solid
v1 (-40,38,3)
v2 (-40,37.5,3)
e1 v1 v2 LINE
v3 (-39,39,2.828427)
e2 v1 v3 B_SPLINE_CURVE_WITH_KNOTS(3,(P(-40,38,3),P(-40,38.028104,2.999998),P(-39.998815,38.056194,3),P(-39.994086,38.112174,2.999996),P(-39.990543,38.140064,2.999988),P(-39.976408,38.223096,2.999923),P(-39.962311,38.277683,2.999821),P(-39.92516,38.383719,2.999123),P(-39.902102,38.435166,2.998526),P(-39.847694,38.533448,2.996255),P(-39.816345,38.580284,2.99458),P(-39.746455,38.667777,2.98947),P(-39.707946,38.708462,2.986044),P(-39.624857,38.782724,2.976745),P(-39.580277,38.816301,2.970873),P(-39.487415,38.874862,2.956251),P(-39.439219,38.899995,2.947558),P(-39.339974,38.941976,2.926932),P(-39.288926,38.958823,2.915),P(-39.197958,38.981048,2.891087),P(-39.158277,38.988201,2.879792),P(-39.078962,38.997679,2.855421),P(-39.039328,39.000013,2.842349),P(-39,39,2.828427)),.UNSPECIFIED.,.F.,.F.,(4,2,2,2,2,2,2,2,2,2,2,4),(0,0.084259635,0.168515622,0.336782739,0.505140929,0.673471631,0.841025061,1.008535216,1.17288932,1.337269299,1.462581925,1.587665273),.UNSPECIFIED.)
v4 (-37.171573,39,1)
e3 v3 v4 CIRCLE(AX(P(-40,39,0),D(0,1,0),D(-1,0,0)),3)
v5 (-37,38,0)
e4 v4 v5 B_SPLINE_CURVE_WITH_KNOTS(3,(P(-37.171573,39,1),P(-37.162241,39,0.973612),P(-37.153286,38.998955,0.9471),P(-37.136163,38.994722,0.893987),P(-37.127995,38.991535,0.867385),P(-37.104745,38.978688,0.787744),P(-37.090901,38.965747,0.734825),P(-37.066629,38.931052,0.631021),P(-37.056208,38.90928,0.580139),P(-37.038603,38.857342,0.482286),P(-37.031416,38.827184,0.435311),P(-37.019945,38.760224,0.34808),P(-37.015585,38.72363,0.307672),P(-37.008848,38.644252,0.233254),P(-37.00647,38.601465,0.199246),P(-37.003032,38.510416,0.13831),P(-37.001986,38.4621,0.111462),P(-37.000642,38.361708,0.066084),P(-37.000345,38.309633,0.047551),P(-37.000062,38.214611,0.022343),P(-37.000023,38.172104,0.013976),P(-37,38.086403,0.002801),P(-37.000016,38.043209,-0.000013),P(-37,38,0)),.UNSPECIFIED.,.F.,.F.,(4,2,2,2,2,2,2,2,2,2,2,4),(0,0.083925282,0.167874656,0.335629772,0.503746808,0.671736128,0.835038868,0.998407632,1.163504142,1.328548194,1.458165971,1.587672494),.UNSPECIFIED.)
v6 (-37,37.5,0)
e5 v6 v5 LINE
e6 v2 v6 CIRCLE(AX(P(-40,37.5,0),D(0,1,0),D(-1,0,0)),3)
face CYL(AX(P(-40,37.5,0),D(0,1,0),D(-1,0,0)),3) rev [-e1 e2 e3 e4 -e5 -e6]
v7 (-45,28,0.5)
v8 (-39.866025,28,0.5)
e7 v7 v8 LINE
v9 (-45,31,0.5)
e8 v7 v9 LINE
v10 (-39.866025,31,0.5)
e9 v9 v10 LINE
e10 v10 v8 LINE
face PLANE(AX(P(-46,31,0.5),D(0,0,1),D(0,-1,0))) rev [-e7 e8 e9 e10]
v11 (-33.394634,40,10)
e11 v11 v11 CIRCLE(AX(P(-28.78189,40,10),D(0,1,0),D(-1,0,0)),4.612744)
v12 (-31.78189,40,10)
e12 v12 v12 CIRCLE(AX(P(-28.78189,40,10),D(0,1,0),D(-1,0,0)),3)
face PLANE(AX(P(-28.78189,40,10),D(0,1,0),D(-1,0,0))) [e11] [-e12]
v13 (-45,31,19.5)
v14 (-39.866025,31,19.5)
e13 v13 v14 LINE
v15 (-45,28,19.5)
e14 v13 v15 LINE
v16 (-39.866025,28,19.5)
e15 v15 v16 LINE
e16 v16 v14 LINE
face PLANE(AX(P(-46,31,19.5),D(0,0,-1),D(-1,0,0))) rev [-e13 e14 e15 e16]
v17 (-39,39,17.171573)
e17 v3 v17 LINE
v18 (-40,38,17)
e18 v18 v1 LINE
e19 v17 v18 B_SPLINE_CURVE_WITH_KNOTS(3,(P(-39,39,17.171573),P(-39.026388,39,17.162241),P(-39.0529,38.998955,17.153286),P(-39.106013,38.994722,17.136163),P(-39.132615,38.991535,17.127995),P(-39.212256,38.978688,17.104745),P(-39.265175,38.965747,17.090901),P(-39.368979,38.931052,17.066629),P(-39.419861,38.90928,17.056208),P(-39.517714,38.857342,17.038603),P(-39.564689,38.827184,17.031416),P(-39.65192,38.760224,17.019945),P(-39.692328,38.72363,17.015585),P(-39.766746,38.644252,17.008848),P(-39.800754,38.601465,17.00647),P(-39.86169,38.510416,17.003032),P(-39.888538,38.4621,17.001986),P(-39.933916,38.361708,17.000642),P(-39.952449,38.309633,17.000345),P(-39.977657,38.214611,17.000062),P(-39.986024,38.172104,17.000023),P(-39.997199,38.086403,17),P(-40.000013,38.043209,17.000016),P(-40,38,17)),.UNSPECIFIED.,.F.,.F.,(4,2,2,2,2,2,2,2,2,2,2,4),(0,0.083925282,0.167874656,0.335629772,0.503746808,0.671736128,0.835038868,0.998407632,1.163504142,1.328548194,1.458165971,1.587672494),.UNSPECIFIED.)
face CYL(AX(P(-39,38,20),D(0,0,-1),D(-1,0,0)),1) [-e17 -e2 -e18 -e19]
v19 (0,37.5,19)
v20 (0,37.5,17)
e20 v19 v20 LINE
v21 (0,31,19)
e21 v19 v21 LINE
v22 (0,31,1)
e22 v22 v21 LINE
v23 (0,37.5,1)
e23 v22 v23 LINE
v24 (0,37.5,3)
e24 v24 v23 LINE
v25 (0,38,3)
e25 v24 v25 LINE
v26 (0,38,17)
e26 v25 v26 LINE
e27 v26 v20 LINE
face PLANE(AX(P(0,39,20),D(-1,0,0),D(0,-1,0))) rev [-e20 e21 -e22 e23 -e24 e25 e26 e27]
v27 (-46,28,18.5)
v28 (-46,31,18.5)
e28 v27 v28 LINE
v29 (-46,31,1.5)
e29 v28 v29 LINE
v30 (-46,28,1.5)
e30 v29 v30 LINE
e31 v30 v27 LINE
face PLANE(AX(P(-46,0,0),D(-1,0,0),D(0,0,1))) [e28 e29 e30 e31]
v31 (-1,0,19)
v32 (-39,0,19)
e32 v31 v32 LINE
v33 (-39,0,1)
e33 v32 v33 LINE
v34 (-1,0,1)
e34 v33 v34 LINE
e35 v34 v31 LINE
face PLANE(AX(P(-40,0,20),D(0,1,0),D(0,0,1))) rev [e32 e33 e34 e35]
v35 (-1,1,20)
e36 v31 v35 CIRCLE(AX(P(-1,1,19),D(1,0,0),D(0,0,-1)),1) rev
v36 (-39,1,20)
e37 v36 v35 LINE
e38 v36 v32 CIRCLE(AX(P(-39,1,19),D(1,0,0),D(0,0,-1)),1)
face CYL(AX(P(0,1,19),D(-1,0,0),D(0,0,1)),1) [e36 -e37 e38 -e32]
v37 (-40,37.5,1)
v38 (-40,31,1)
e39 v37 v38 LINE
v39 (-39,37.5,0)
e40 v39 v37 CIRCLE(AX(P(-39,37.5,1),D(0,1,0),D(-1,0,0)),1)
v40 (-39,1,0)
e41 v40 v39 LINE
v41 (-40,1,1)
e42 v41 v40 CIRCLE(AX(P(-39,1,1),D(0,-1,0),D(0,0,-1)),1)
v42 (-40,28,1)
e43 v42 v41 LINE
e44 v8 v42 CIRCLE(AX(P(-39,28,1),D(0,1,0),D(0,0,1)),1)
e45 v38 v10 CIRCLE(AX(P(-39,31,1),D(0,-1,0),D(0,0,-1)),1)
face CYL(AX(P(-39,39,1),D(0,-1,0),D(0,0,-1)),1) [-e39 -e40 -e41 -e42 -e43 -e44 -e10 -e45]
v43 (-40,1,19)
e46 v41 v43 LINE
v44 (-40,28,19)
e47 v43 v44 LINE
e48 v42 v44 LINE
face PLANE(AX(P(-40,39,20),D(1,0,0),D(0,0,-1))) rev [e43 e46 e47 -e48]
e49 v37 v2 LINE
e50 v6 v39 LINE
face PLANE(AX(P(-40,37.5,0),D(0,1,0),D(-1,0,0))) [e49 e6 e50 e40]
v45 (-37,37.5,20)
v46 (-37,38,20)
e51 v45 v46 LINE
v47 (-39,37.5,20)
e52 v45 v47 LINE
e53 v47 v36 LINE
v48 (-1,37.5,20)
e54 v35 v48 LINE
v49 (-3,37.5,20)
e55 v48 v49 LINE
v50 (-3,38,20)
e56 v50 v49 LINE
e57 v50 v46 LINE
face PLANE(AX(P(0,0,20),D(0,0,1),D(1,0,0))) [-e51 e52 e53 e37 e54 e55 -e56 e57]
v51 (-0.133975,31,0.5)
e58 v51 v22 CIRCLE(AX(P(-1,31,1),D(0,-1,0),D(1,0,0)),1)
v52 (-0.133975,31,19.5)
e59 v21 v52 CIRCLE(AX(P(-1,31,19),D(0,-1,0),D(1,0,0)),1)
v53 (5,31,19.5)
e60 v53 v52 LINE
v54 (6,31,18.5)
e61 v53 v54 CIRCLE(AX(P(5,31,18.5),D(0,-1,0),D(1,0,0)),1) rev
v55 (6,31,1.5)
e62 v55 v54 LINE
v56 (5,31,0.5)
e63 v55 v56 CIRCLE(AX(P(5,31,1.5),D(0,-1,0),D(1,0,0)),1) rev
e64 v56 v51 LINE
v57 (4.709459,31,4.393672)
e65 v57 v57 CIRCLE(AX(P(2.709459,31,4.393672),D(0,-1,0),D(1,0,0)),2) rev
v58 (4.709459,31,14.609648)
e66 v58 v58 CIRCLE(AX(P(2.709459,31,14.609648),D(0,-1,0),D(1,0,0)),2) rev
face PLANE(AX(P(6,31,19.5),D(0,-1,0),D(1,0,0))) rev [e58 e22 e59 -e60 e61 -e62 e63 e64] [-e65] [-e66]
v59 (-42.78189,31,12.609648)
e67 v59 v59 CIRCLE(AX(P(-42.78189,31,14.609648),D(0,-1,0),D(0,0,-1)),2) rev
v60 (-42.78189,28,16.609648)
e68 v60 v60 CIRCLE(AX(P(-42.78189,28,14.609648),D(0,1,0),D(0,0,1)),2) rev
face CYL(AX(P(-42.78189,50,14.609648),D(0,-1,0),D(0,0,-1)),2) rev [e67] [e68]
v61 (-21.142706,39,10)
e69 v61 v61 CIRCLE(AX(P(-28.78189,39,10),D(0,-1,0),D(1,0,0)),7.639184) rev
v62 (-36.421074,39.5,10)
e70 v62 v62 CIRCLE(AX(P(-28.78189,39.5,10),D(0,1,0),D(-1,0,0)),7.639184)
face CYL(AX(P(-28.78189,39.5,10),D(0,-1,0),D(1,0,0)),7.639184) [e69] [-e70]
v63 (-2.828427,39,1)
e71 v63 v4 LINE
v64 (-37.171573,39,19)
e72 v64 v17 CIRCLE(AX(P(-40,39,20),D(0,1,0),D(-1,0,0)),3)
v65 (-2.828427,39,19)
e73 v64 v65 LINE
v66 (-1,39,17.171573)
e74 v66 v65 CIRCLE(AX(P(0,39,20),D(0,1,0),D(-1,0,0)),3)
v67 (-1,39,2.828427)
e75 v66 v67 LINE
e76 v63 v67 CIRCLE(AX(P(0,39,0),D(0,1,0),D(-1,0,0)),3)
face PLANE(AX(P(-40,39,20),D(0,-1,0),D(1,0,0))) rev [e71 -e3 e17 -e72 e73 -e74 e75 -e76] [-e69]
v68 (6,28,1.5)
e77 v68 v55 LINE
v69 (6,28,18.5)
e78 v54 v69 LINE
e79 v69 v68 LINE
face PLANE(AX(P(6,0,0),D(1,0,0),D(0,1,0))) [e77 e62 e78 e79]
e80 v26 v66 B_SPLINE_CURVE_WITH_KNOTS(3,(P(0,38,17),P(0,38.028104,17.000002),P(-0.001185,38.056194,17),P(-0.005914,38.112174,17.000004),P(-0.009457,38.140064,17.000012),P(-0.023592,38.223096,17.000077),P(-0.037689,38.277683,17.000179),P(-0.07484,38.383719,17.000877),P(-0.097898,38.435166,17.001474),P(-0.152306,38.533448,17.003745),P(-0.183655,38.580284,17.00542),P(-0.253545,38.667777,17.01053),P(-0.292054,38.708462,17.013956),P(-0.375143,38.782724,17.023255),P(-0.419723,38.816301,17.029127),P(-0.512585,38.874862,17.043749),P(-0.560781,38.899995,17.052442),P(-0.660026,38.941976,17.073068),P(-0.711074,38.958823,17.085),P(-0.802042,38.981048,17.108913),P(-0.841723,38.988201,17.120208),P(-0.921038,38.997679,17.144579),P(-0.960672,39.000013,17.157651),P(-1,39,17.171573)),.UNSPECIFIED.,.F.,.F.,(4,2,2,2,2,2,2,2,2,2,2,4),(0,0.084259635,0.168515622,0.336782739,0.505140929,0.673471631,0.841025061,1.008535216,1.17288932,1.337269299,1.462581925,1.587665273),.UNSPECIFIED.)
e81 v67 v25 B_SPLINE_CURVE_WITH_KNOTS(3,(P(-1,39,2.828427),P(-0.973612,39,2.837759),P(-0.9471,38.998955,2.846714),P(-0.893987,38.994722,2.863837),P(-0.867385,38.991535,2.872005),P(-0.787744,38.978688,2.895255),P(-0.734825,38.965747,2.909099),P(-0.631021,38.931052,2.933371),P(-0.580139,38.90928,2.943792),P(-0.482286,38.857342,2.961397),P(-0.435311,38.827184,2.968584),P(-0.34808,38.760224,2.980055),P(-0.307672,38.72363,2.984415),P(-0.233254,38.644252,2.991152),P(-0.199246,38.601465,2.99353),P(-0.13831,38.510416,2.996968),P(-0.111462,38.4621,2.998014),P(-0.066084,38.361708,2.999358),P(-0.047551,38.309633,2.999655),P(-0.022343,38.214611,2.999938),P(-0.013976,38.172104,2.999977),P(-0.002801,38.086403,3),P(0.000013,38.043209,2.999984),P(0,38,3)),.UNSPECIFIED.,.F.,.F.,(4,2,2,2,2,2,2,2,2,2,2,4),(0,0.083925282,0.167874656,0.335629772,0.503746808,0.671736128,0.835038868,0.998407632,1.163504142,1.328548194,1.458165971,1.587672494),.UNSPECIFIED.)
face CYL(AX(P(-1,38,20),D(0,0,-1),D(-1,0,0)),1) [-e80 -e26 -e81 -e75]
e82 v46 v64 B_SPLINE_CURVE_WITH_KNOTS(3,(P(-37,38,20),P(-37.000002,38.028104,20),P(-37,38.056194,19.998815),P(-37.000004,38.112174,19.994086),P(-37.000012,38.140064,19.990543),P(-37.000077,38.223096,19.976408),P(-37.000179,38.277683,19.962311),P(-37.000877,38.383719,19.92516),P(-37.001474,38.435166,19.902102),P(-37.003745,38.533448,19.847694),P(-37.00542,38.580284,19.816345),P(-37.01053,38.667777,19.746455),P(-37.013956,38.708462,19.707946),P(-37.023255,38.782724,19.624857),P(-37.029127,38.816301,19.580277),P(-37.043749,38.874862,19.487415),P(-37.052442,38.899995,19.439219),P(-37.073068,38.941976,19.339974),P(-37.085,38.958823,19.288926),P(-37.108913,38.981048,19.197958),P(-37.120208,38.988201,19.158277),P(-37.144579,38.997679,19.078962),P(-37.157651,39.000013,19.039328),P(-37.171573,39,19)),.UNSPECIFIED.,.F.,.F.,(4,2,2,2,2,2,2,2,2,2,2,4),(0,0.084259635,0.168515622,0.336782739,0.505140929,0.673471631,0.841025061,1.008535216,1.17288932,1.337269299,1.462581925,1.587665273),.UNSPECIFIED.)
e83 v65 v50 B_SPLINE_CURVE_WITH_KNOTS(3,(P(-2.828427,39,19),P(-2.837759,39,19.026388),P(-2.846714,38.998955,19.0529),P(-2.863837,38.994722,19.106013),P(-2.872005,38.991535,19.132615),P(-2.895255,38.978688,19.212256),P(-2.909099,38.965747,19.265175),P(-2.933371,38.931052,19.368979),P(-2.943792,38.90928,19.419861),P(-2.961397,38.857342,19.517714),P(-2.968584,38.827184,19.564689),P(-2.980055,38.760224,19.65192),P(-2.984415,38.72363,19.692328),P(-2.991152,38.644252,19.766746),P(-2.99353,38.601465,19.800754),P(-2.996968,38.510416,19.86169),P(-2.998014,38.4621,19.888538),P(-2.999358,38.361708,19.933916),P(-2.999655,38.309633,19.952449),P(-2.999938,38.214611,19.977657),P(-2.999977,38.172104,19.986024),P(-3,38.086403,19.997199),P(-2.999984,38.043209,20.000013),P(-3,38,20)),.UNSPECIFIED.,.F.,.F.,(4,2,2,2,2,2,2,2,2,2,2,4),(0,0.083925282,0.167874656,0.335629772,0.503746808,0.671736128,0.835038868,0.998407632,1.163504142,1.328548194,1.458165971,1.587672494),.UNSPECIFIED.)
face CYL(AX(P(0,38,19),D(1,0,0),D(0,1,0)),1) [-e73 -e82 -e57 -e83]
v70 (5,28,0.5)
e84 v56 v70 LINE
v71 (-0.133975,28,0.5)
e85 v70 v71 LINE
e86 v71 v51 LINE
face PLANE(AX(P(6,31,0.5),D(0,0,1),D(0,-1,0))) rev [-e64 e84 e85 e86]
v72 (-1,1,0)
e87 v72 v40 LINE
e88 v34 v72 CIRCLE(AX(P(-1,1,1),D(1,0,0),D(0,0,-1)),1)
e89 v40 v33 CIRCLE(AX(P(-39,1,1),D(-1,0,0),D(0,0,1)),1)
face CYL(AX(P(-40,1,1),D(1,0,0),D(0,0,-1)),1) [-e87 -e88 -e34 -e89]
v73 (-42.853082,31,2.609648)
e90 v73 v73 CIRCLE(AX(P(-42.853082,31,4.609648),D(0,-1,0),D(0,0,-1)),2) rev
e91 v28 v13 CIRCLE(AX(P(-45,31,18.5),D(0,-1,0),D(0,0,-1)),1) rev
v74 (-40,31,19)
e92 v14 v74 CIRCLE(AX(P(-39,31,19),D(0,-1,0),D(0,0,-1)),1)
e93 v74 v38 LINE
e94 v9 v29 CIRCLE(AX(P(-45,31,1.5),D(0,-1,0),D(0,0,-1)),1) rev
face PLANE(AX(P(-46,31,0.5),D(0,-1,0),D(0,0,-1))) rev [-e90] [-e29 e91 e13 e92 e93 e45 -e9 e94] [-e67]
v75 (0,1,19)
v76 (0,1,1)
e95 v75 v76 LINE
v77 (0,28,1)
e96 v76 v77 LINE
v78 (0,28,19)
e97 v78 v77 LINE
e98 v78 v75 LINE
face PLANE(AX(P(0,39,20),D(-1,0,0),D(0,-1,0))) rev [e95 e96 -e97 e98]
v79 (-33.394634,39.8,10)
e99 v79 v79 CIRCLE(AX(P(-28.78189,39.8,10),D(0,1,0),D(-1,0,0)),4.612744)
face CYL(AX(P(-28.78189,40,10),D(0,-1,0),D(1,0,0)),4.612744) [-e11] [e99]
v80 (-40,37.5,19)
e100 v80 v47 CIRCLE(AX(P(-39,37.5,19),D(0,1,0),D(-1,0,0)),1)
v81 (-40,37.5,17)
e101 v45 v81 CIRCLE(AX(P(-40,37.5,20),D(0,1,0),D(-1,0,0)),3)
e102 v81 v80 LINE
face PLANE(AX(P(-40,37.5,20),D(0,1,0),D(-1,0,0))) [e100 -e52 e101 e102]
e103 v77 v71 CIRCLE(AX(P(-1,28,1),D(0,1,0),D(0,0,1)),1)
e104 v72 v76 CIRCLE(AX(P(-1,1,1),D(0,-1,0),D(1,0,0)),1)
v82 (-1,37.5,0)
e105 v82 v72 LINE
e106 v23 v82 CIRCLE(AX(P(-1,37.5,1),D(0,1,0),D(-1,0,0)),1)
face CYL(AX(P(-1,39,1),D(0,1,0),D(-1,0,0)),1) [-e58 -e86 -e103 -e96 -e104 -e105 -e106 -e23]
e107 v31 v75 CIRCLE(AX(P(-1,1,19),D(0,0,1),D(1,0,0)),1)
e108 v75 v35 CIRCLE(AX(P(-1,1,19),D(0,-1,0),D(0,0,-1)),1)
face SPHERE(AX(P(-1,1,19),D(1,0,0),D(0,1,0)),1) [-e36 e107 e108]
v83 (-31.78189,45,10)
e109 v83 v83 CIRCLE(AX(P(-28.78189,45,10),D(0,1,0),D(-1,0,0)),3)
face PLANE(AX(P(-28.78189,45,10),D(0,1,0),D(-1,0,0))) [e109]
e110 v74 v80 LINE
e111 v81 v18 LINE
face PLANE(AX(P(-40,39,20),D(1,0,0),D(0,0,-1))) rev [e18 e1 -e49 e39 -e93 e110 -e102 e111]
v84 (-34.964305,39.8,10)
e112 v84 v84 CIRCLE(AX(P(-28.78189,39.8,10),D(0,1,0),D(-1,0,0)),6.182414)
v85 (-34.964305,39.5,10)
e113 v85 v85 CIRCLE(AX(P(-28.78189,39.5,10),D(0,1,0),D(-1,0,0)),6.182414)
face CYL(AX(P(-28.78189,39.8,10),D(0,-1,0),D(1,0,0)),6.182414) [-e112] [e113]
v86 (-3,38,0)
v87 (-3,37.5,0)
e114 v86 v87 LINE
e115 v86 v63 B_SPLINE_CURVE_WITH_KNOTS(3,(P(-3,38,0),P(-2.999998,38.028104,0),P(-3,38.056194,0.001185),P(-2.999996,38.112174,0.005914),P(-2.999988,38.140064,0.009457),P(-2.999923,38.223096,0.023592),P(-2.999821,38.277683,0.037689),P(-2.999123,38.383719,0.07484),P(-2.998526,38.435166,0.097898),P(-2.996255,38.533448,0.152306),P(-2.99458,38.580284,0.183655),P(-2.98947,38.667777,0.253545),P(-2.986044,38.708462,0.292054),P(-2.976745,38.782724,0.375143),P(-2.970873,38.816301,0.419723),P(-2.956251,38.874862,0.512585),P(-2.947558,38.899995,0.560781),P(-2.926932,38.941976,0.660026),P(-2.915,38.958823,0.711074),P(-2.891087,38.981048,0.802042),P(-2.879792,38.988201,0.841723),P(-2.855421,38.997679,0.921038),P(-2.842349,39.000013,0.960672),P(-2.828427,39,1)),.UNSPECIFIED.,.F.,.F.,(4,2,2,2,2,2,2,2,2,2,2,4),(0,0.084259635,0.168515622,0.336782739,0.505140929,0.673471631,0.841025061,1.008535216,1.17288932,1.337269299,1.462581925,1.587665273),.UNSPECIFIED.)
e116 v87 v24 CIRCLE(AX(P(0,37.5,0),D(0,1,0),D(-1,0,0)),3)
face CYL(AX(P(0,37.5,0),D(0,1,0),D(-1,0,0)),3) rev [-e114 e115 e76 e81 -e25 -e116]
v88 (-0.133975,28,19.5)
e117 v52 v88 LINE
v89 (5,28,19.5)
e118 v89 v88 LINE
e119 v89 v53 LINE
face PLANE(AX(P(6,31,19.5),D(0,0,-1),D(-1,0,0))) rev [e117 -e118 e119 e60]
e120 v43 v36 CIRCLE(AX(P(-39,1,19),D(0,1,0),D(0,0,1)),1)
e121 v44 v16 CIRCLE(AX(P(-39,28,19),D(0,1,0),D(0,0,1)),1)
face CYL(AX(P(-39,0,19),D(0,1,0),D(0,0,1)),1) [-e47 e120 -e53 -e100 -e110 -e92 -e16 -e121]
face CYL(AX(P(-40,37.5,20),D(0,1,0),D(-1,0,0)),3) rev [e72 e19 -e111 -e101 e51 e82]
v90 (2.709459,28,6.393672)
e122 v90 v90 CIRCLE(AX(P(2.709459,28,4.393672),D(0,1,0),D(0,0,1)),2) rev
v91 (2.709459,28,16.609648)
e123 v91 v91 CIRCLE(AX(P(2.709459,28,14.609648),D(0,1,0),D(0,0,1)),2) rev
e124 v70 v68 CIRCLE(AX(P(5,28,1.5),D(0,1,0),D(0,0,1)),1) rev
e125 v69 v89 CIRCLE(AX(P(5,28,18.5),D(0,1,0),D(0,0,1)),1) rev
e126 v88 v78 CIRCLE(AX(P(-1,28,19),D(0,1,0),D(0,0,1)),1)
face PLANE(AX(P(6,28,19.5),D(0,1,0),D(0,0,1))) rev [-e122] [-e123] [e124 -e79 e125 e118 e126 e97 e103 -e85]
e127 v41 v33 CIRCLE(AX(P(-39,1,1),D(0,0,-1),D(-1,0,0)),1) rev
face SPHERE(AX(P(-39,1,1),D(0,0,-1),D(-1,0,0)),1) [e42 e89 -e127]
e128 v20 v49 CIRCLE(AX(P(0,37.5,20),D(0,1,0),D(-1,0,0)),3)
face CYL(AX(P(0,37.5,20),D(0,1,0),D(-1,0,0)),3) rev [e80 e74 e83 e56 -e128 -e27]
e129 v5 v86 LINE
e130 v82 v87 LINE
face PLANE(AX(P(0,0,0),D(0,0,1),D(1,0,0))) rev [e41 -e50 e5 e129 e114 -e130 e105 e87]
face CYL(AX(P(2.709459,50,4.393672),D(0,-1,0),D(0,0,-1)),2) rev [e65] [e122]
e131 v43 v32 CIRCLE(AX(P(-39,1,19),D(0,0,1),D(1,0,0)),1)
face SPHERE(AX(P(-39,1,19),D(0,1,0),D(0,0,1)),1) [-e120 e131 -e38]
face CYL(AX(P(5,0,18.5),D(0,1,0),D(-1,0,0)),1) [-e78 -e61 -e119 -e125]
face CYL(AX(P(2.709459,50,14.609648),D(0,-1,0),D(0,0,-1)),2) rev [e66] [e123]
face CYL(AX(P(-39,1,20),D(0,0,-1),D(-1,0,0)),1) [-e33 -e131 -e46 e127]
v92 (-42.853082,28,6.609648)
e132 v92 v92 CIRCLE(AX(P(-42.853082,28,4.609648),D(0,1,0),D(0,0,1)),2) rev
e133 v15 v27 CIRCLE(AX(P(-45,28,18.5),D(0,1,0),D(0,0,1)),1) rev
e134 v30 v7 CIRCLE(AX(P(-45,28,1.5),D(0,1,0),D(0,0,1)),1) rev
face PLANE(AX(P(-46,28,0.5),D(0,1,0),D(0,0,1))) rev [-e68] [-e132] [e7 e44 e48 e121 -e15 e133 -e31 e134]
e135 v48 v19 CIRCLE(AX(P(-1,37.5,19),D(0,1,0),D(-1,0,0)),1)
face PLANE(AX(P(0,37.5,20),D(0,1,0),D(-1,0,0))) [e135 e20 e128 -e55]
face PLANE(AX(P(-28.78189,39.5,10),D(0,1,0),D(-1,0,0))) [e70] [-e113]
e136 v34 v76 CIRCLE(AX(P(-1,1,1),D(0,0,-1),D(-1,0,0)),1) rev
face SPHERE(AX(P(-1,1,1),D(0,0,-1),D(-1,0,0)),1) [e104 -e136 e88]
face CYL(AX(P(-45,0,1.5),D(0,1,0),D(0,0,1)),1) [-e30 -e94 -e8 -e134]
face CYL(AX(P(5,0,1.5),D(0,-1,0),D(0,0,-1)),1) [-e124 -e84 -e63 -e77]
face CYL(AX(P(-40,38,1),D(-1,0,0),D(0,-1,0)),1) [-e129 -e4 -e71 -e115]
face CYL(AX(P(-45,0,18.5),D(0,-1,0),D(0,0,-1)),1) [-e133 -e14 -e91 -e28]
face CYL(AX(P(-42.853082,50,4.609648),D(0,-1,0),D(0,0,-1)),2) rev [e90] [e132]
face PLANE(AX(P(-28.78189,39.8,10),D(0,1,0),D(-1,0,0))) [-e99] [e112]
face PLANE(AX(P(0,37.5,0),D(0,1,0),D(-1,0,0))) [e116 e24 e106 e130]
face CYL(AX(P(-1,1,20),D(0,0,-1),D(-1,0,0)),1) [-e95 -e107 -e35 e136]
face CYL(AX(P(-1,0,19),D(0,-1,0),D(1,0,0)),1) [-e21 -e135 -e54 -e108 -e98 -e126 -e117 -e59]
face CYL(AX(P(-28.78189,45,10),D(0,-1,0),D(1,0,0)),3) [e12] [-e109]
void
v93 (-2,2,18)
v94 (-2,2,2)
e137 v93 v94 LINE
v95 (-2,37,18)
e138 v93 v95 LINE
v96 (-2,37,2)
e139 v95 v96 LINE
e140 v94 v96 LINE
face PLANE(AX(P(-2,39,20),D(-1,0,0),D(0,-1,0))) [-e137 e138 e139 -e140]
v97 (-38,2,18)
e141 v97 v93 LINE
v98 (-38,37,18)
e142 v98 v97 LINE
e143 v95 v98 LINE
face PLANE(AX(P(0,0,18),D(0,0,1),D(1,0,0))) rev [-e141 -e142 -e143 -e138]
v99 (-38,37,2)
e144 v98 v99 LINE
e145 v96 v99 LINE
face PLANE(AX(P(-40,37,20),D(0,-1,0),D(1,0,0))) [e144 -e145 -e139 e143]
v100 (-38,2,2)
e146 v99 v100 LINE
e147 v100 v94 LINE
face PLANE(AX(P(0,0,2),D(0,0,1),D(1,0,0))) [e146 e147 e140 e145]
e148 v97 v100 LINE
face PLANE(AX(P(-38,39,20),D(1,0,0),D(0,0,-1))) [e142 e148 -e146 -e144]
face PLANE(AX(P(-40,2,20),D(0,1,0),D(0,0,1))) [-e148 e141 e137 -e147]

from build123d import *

# Parameters (mm, degrees)
SKETCH_1_W           = 40
SKETCH_1_H           = 39
EXTRUDE_1_DEPTH      = 20
SHELL_1_T            = 2
SKETCH_18_R          = 7.639183899
EXTRUDE_8_DEPTH      = 0.5
SKETCH_24_R          = 6.182414347
EXTRUDE_12_DEPTH     = 0.3
SKETCH_25_R          = 4.612744259
EXTRUDE_13_DEPTH     = 0.2
SKETCH_52_R          = 3
EXTRUDE_14_DEPTH     = 5
SKETCH_55_R          = 3
CUT_EXTRUDE_37_DEPTH = 1.5
SKETCH_78_W          = 19
SKETCH_78_H          = 3
EXTRUDE_16_DEPTH     = 6
SKETCH_79_W          = 19
SKETCH_79_H          = 3
EXTRUDE_17_DEPTH     = 6
FILLET_7_R           = 1
SKETCH_5_R           = 2
CUT_EXTRUDE_45_DEPTH = 50
FILLET_8_R           = 1


with BuildPart() as part:
    # 草图1 → 凸台-拉伸1 (new body)
    with BuildSketch(Plane.XY):
        with Locations((-20, 19.5)):
            Rectangle(SKETCH_1_W, SKETCH_1_H)
    extrude(amount=EXTRUDE_1_DEPTH)

    # 抽壳1 (no face opened: a closed hollow body)
    add(offset(amount=-SHELL_1_T, mode=Mode.PRIVATE), mode=Mode.SUBTRACT)

    # 草图18 → 凸台-拉伸8 (add)
    with BuildSketch(Plane(origin=(0, 39, 0), x_dir=(1, 0, 0), z_dir=(0, 1, 0))):
        with Locations((-28.781890175, -10)):
            Circle(SKETCH_18_R)
    extrude(amount=EXTRUDE_8_DEPTH)

    # 草图24 → 凸台-拉伸12 (add)
    with BuildSketch(Plane(origin=(0, 39.5, 0), x_dir=(1, 0, 0), z_dir=(0, 1, 0))):
        with Locations(Location((-28.781890175, -10, 0), (0, 0, 180))):
            Circle(SKETCH_24_R)
    extrude(amount=EXTRUDE_12_DEPTH)

    # 草图25 → 凸台-拉伸13 (add)
    with BuildSketch(Plane(origin=(0, 39.8, 0), x_dir=(1, 0, 0), z_dir=(0, 1, 0))):
        with Locations(Location((-28.781890175, -10, 0), (0, 0, 180))):
            Circle(SKETCH_25_R)
    extrude(amount=EXTRUDE_13_DEPTH)

    # 草图52 → 凸台-拉伸14 (add)
    with BuildSketch(Plane(origin=(0, 40, 0), x_dir=(1, 0, 0), z_dir=(0, 1, 0))):
        with Locations(Location((-28.781890175, -10, 0), (0, 0, 180))):
            Circle(SKETCH_52_R)
    extrude(amount=EXTRUDE_14_DEPTH)

    # 草图55 → 切除-拉伸37 (cut)
    with BuildSketch(Plane(origin=(0, 39, 0), x_dir=(1, 0, 0), z_dir=(0, 1, 0))):
        with Locations((-40, -20)):
            Circle(SKETCH_55_R)
        with Locations((-40, 0)):
            Circle(SKETCH_55_R)
        with Locations((0, -20)):
            Circle(SKETCH_55_R)
        Circle(SKETCH_55_R)
    extrude(amount=-CUT_EXTRUDE_37_DEPTH, mode=Mode.SUBTRACT)

    # 草图78 → 凸台-拉伸16 (add)
    with BuildSketch(Plane(origin=(0, 0, 0), x_dir=(0, 0, -1), z_dir=(1, 0, 0))):
        with Locations((-10, 29.5)):
            Rectangle(SKETCH_78_W, SKETCH_78_H)
    extrude(amount=EXTRUDE_16_DEPTH)

    # 草图79 → 凸台-拉伸17 (add)
    with BuildSketch(Plane.ZY.offset(40)):
        with Locations((10, 29.5)):
            Rectangle(SKETCH_79_W, SKETCH_79_H)
    extrude(amount=EXTRUDE_17_DEPTH)

    # 圆角7
    # the kernel refuses this fillet: 1 mm, written as the material it takes off along each edge
    with BuildSketch(Plane(origin=(-46, 33.5, 19.5), x_dir=(1, 0, 0), z_dir=(0, -1, 0))) as fillet_7_piece_1:
        with BuildLine():
            CenterArc((FILLET_7_R, -FILLET_7_R), FILLET_7_R, 90, 90)
            Line((0, -FILLET_7_R), (0, 0))
            Line((0, 0), (FILLET_7_R, 0))
        make_face()
    extrude(amount=8, mode=Mode.SUBTRACT)
    with BuildSketch(Plane(origin=(-40, -2.5, 20), x_dir=(1, 0, 0), z_dir=(0, 1, 0))) as fillet_7_piece_2_section:
        with BuildLine():
            CenterArc((FILLET_7_R, FILLET_7_R), FILLET_7_R, 180, 90)
            Line((0, FILLET_7_R), (0, 0))
            Line((0, 0), (FILLET_7_R, 0))
        make_face()
    fillet_7_piece_2 = extrude(amount=42.5, mode=Mode.PRIVATE)
    fillet_7_piece_2 = split(fillet_7_piece_2, bisect_by=Plane(origin=(-39.74487994, 28, 19.835608236), z_dir=(0, -1, 0)), keep=Keep.TOP, mode=Mode.PRIVATE)
    fillet_7_piece_2 = split(fillet_7_piece_2, bisect_by=Plane(origin=(-39.74487994, 12.75, 19.5), z_dir=(0, 0, 1)), keep=Keep.TOP, mode=Mode.PRIVATE)
    add(fillet_7_piece_2, mode=Mode.SUBTRACT)
    with BuildSketch(Plane(origin=(-40, -2.5, 20), x_dir=(1, 0, 0), z_dir=(0, 1, 0))) as fillet_7_piece_3_section:
        with BuildLine():
            CenterArc((FILLET_7_R, FILLET_7_R), FILLET_7_R, 180, 90)
            Line((0, FILLET_7_R), (0, 0))
            Line((0, 0), (FILLET_7_R, 0))
        make_face()
    fillet_7_piece_3 = extrude(amount=42.5, mode=Mode.PRIVATE)
    fillet_7_piece_3 = split(fillet_7_piece_3, bisect_by=Plane(origin=(-39.975991618, 28, 19.336749215), z_dir=(0, -1, 0)), keep=Keep.TOP, mode=Mode.PRIVATE)
    fillet_7_piece_3 = split(fillet_7_piece_3, bisect_by=Plane(origin=(-39.975991618, 12.75, 19.5), z_dir=(0, 0, -1)), keep=Keep.TOP, mode=Mode.PRIVATE)
    add(fillet_7_piece_3, mode=Mode.SUBTRACT)
    with BuildSketch(Plane(origin=(-40, -2.5, 20), x_dir=(1, 0, 0), z_dir=(0, 1, 0))) as fillet_7_piece_4_section:
        with BuildLine():
            CenterArc((FILLET_7_R, FILLET_7_R), FILLET_7_R, 180, 90)
            Line((0, FILLET_7_R), (0, 0))
            Line((0, 0), (FILLET_7_R, 0))
        make_face()
    fillet_7_piece_4 = extrude(amount=42.5, mode=Mode.PRIVATE)
    fillet_7_piece_4 = split(fillet_7_piece_4, bisect_by=Plane(origin=(-39.74487994, 28, 19.835608236), z_dir=(0, 1, 0)), keep=Keep.TOP, mode=Mode.PRIVATE)
    fillet_7_piece_4 = split(fillet_7_piece_4, bisect_by=Plane(origin=(-39.74487994, 29.5, 19.5), z_dir=(0, 0, 1)), keep=Keep.TOP, mode=Mode.PRIVATE)
    fillet_7_piece_4 = split(fillet_7_piece_4, bisect_by=Plane(origin=(-39.74487994, 31, 19.835608236), z_dir=(0, -1, 0)), keep=Keep.TOP, mode=Mode.PRIVATE)
    add(fillet_7_piece_4, mode=Mode.SUBTRACT)
    with BuildSketch(Plane(origin=(-40, -2.5, 20), x_dir=(1, 0, 0), z_dir=(0, 1, 0))) as fillet_7_piece_5_section:
        with BuildLine():
            CenterArc((FILLET_7_R, FILLET_7_R), FILLET_7_R, 180, 90)
            Line((0, FILLET_7_R), (0, 0))
            Line((0, 0), (FILLET_7_R, 0))
        make_face()
    fillet_7_piece_5 = extrude(amount=42.5, mode=Mode.PRIVATE)
    fillet_7_piece_5 = split(fillet_7_piece_5, bisect_by=Plane(origin=(-39.74487994, 35.5, 19.5), z_dir=(0, 0, 1)), keep=Keep.TOP, mode=Mode.PRIVATE)
    fillet_7_piece_5 = split(fillet_7_piece_5, bisect_by=Plane(origin=(-39.74487994, 31, 19.835608236), z_dir=(0, 1, 0)), keep=Keep.TOP, mode=Mode.PRIVATE)
    add(fillet_7_piece_5, mode=Mode.SUBTRACT)
    with BuildSketch(Plane(origin=(-40, -2.5, 20), x_dir=(1, 0, 0), z_dir=(0, 1, 0))) as fillet_7_piece_6_section:
        with BuildLine():
            CenterArc((FILLET_7_R, FILLET_7_R), FILLET_7_R, 180, 90)
            Line((0, FILLET_7_R), (0, 0))
            Line((0, 0), (FILLET_7_R, 0))
        make_face()
    fillet_7_piece_6 = extrude(amount=42.5, mode=Mode.PRIVATE)
    fillet_7_piece_6 = split(fillet_7_piece_6, bisect_by=Plane(origin=(-39.975991618, 35.5, 19.5), z_dir=(0, 0, -1)), keep=Keep.TOP, mode=Mode.PRIVATE)
    fillet_7_piece_6 = split(fillet_7_piece_6, bisect_by=Plane(origin=(-39.975991618, 31, 19.336749215), z_dir=(0, 1, 0)), keep=Keep.TOP, mode=Mode.PRIVATE)
    add(fillet_7_piece_6, mode=Mode.SUBTRACT)

    # 草图5 → 切除-拉伸45 (cut)
    with BuildSketch(Plane(origin=(0, 0, 0), x_dir=(1, 0, 0), z_dir=(0, 1, 0))):
        with Locations(Location((-42.781890175, -14.609647665, 0), (0, 0, 90))):
            Circle(SKETCH_5_R)
        with Locations(Location((-42.853081645, -4.609647665, 0), (0, 0, 90))):
            Circle(SKETCH_5_R)
        with Locations((2.709458981, -4.393671759)):
            Circle(SKETCH_5_R)
        with Locations((2.709458981, -14.609647665)):
            Circle(SKETCH_5_R)
    extrude(amount=CUT_EXTRUDE_45_DEPTH, mode=Mode.SUBTRACT)

    # 圆角8
    # the kernel refuses this fillet: 1 mm, written as the material it takes off along each edge
    with BuildSketch(Plane(origin=(-1, 1, 19), x_dir=(1, 0, 0), z_dir=(0, -1, 0))) as fillet_8_piece_1_section:
        Polygon((0, 0), (FILLET_8_R, 0), (FILLET_8_R, FILLET_8_R), (0, FILLET_8_R), align=None)
    fillet_8_piece_1 = extrude(amount=FILLET_8_R, mode=Mode.PRIVATE)
    fillet_8_piece_1 = fillet_8_piece_1 - Plane(origin=(-1, 1, 19), x_dir=(-0.7071067811865475, 0, -0.7071067811865475), z_dir=(0, -1, 0)) * Sphere(FILLET_8_R, mode=Mode.PRIVATE)
    add(fillet_8_piece_1, mode=Mode.SUBTRACT)
    with BuildSketch(Plane(origin=(-39, 1, 1), x_dir=(0, 0, -1), z_dir=(-1, 0, 0))) as fillet_8_piece_2_section:
        Polygon((0, 0), (FILLET_8_R, 0), (FILLET_8_R, FILLET_8_R), (0, FILLET_8_R), align=None)
    fillet_8_piece_2 = extrude(amount=FILLET_8_R, mode=Mode.PRIVATE)
    fillet_8_piece_2 = fillet_8_piece_2 - Plane(origin=(-39, 1, 1), x_dir=(0, 0.7071067811865475, 0.7071067811865475), z_dir=(-1, 0, 0)) * Sphere(FILLET_8_R, mode=Mode.PRIVATE)
    add(fillet_8_piece_2, mode=Mode.SUBTRACT)
    with BuildSketch(Plane(origin=(-1, 1, 1), x_dir=(0, -1, 0), z_dir=(0, 0, -1))) as fillet_8_piece_3_section:
        Polygon((0, 0), (FILLET_8_R, 0), (FILLET_8_R, -FILLET_8_R), (0, -FILLET_8_R), align=None)
    fillet_8_piece_3 = extrude(amount=FILLET_8_R, mode=Mode.PRIVATE)
    fillet_8_piece_3 = fillet_8_piece_3 - Plane(origin=(-1, 1, 1), x_dir=(-0.7071067811865475, 0.7071067811865475, 0), z_dir=(0, 0, -1)) * Sphere(FILLET_8_R, mode=Mode.PRIVATE)
    add(fillet_8_piece_3, mode=Mode.SUBTRACT)
    with BuildSketch(Plane(origin=(-1, 0, 20), x_dir=(0, 1, 0), z_dir=(-1, 0, 0))) as fillet_8_piece_4:
        with BuildLine():
            CenterArc((FILLET_8_R, FILLET_8_R), FILLET_8_R, 180, 90)
            Line((0, FILLET_8_R), (0, 0))
            Line((0, 0), (FILLET_8_R, 0))
        make_face()
    extrude(amount=38, mode=Mode.SUBTRACT)
    with BuildSketch(Plane(origin=(-39, 0, 19), x_dir=(0, 0, 1), z_dir=(1, 0, 0))) as fillet_8_piece_5:
        with BuildLine():
            CenterArc((1 - FILLET_8_R, -FILLET_8_R), FILLET_8_R, 0, 90)
            Line((1, -FILLET_8_R), (1, 0))
            Line((1, 0), (1 - FILLET_8_R, 0))
        make_face()
    revolve(axis=Axis((-39, 0, 19), (0, -1, 0)), revolution_arc=90, mode=Mode.SUBTRACT)
    with BuildSketch(Plane(origin=(-40, 0, 1), x_dir=(0, 1, 0), z_dir=(0, 0, 1))) as fillet_8_piece_6:
        with BuildLine():
            CenterArc((FILLET_8_R, -FILLET_8_R), FILLET_8_R, 90, 90)
            Line((0, -FILLET_8_R), (0, 0))
            Line((0, 0), (FILLET_8_R, 0))
        make_face()
    extrude(amount=18, mode=Mode.SUBTRACT)
    with BuildSketch(Plane(origin=(0, 0, 1), x_dir=(0, 1, 0), z_dir=(0, 0, 1))) as fillet_8_piece_7:
        with BuildLine():
            CenterArc((FILLET_8_R, FILLET_8_R), FILLET_8_R, 180, 90)
            Line((0, FILLET_8_R), (0, 0))
            Line((0, 0), (FILLET_8_R, 0))
        make_face()
    extrude(amount=18, mode=Mode.SUBTRACT)
    with BuildSketch(Plane(origin=(-1, 0, 0), x_dir=(0, 1, 0), z_dir=(-1, 0, 0))) as fillet_8_piece_8:
        with BuildLine():
            CenterArc((FILLET_8_R, -FILLET_8_R), FILLET_8_R, 90, 90)
            Line((0, -FILLET_8_R), (0, 0))
            Line((0, 0), (FILLET_8_R, 0))
        make_face()
    extrude(amount=38, mode=Mode.SUBTRACT)
    with BuildSketch(Plane(origin=(0, 40, 0), x_dir=(-1, 0, 0), z_dir=(0, -1, 0))) as fillet_8_piece_9_section:
        with BuildLine():
            CenterArc((FILLET_8_R, -FILLET_8_R), FILLET_8_R, 90, 90)
            Line((0, -FILLET_8_R), (0, 0))
            Line((0, 0), (FILLET_8_R, 0))
        make_face()
    fillet_8_piece_9 = extrude(amount=39, mode=Mode.PRIVATE)
    fillet_8_piece_9 = split(fillet_8_piece_9, bisect_by=Plane(origin=(-0.25512006, 35.5, 0.5), z_dir=(0, 0, -1)), keep=Keep.TOP, mode=Mode.PRIVATE)
    fillet_8_piece_9 = split(fillet_8_piece_9, bisect_by=Plane(origin=(-0.25512006, 31, 0.164391764), z_dir=(0, 1, 0)), keep=Keep.TOP, mode=Mode.PRIVATE)
    add(fillet_8_piece_9, mode=Mode.SUBTRACT)
    with BuildSketch(Plane(origin=(0, 40, 0), x_dir=(-1, 0, 0), z_dir=(0, -1, 0))) as fillet_8_piece_10_section:
        with BuildLine():
            CenterArc((FILLET_8_R, -FILLET_8_R), FILLET_8_R, 90, 90)
            Line((0, -FILLET_8_R), (0, 0))
            Line((0, 0), (FILLET_8_R, 0))
        make_face()
    fillet_8_piece_10 = extrude(amount=39, mode=Mode.PRIVATE)
    fillet_8_piece_10 = split(fillet_8_piece_10, bisect_by=Plane(origin=(-0.024008382, 35.5, 0.5), z_dir=(0, 0, 1)), keep=Keep.TOP, mode=Mode.PRIVATE)
    fillet_8_piece_10 = split(fillet_8_piece_10, bisect_by=Plane(origin=(-0.024008382, 31, 0.663250785), z_dir=(0, 1, 0)), keep=Keep.TOP, mode=Mode.PRIVATE)
    add(fillet_8_piece_10, mode=Mode.SUBTRACT)
    with BuildSketch(Plane(origin=(0, 40, 0), x_dir=(-1, 0, 0), z_dir=(0, -1, 0))) as fillet_8_piece_11_section:
        with BuildLine():
            CenterArc((FILLET_8_R, -FILLET_8_R), FILLET_8_R, 90, 90)
            Line((0, -FILLET_8_R), (0, 0))
            Line((0, 0), (FILLET_8_R, 0))
        make_face()
    fillet_8_piece_11 = extrude(amount=39, mode=Mode.PRIVATE)
    fillet_8_piece_11 = split(fillet_8_piece_11, bisect_by=Plane(origin=(-0.25512006, 28, 0.164391764), z_dir=(0, 1, 0)), keep=Keep.TOP, mode=Mode.PRIVATE)
    fillet_8_piece_11 = split(fillet_8_piece_11, bisect_by=Plane(origin=(-0.25512006, 29.5, 0.5), z_dir=(0, 0, -1)), keep=Keep.TOP, mode=Mode.PRIVATE)
    fillet_8_piece_11 = split(fillet_8_piece_11, bisect_by=Plane(origin=(-0.25512006, 31, 0.164391764), z_dir=(0, -1, 0)), keep=Keep.TOP, mode=Mode.PRIVATE)
    add(fillet_8_piece_11, mode=Mode.SUBTRACT)
    with BuildSketch(Plane(origin=(0, 40, 0), x_dir=(-1, 0, 0), z_dir=(0, -1, 0))) as fillet_8_piece_12_section:
        with BuildLine():
            CenterArc((FILLET_8_R, -FILLET_8_R), FILLET_8_R, 90, 90)
            Line((0, -FILLET_8_R), (0, 0))
            Line((0, 0), (FILLET_8_R, 0))
        make_face()
    fillet_8_piece_12 = extrude(amount=39, mode=Mode.PRIVATE)
    fillet_8_piece_12 = split(fillet_8_piece_12, bisect_by=Plane(origin=(-0.25512006, 28, 0.164391764), z_dir=(0, -1, 0)), keep=Keep.TOP, mode=Mode.PRIVATE)
    fillet_8_piece_12 = split(fillet_8_piece_12, bisect_by=Plane(origin=(-0.25512006, 14.5, 0.5), z_dir=(0, 0, -1)), keep=Keep.TOP, mode=Mode.PRIVATE)
    add(fillet_8_piece_12, mode=Mode.SUBTRACT)
    with BuildSketch(Plane(origin=(0, 40, 0), x_dir=(-1, 0, 0), z_dir=(0, -1, 0))) as fillet_8_piece_13_section:
        with BuildLine():
            CenterArc((FILLET_8_R, -FILLET_8_R), FILLET_8_R, 90, 90)
            Line((0, -FILLET_8_R), (0, 0))
            Line((0, 0), (FILLET_8_R, 0))
        make_face()
    fillet_8_piece_13 = extrude(amount=39, mode=Mode.PRIVATE)
    fillet_8_piece_13 = split(fillet_8_piece_13, bisect_by=Plane(origin=(-0.024008382, 28, 0.663250785), z_dir=(0, -1, 0)), keep=Keep.TOP, mode=Mode.PRIVATE)
    fillet_8_piece_13 = split(fillet_8_piece_13, bisect_by=Plane(origin=(-0.024008382, 14.5, 0.5), z_dir=(0, 0, 1)), keep=Keep.TOP, mode=Mode.PRIVATE)
    add(fillet_8_piece_13, mode=Mode.SUBTRACT)
    with BuildSketch(Plane(origin=(-40, 1, 0), x_dir=(1, 0, 0), z_dir=(0, 1, 0))) as fillet_8_piece_14_section:
        with BuildLine():
            CenterArc((FILLET_8_R, -FILLET_8_R), FILLET_8_R, 90, 90)
            Line((0, -FILLET_8_R), (0, 0))
            Line((0, 0), (FILLET_8_R, 0))
        make_face()
    fillet_8_piece_14 = extrude(amount=39, mode=Mode.PRIVATE)
    fillet_8_piece_14 = split(fillet_8_piece_14, bisect_by=Plane(origin=(-39.74487994, 14.5, 0.5), z_dir=(0, 0, -1)), keep=Keep.TOP, mode=Mode.PRIVATE)
    fillet_8_piece_14 = split(fillet_8_piece_14, bisect_by=Plane(origin=(-39.74487994, 28, 0.164391764), z_dir=(0, -1, 0)), keep=Keep.TOP, mode=Mode.PRIVATE)
    add(fillet_8_piece_14, mode=Mode.SUBTRACT)
    with BuildSketch(Plane(origin=(-40, 1, 0), x_dir=(1, 0, 0), z_dir=(0, 1, 0))) as fillet_8_piece_15_section:
        with BuildLine():
            CenterArc((FILLET_8_R, -FILLET_8_R), FILLET_8_R, 90, 90)
            Line((0, -FILLET_8_R), (0, 0))
            Line((0, 0), (FILLET_8_R, 0))
        make_face()
    fillet_8_piece_15 = extrude(amount=39, mode=Mode.PRIVATE)
    fillet_8_piece_15 = split(fillet_8_piece_15, bisect_by=Plane(origin=(-39.975991618, 14.5, 0.5), z_dir=(0, 0, 1)), keep=Keep.TOP, mode=Mode.PRIVATE)
    fillet_8_piece_15 = split(fillet_8_piece_15, bisect_by=Plane(origin=(-39.975991618, 28, 0.663250785), z_dir=(0, -1, 0)), keep=Keep.TOP, mode=Mode.PRIVATE)
    add(fillet_8_piece_15, mode=Mode.SUBTRACT)
    with BuildSketch(Plane(origin=(-40, 1, 0), x_dir=(1, 0, 0), z_dir=(0, 1, 0))) as fillet_8_piece_16_section:
        with BuildLine():
            CenterArc((FILLET_8_R, -FILLET_8_R), FILLET_8_R, 90, 90)
            Line((0, -FILLET_8_R), (0, 0))
            Line((0, 0), (FILLET_8_R, 0))
        make_face()
    fillet_8_piece_16 = extrude(amount=39, mode=Mode.PRIVATE)
    fillet_8_piece_16 = split(fillet_8_piece_16, bisect_by=Plane(origin=(-39.74487994, 31, 0.164391764), z_dir=(0, -1, 0)), keep=Keep.TOP, mode=Mode.PRIVATE)
    fillet_8_piece_16 = split(fillet_8_piece_16, bisect_by=Plane(origin=(-39.74487994, 29.5, 0.5), z_dir=(0, 0, -1)), keep=Keep.TOP, mode=Mode.PRIVATE)
    fillet_8_piece_16 = split(fillet_8_piece_16, bisect_by=Plane(origin=(-39.74487994, 28, 0.164391764), z_dir=(0, 1, 0)), keep=Keep.TOP, mode=Mode.PRIVATE)
    add(fillet_8_piece_16, mode=Mode.SUBTRACT)
    with BuildSketch(Plane(origin=(-40, 1, 0), x_dir=(1, 0, 0), z_dir=(0, 1, 0))) as fillet_8_piece_17_section:
        with BuildLine():
            CenterArc((FILLET_8_R, -FILLET_8_R), FILLET_8_R, 90, 90)
            Line((0, -FILLET_8_R), (0, 0))
            Line((0, 0), (FILLET_8_R, 0))
        make_face()
    fillet_8_piece_17 = extrude(amount=39, mode=Mode.PRIVATE)
    fillet_8_piece_17 = split(fillet_8_piece_17, bisect_by=Plane(origin=(-39.74487994, 31, 0.164391764), z_dir=(0, 1, 0)), keep=Keep.TOP, mode=Mode.PRIVATE)
    fillet_8_piece_17 = split(fillet_8_piece_17, bisect_by=Plane(origin=(-39.74487994, 35.5, 0.5), z_dir=(0, 0, -1)), keep=Keep.TOP, mode=Mode.PRIVATE)
    add(fillet_8_piece_17, mode=Mode.SUBTRACT)
    with BuildSketch(Plane(origin=(-40, 1, 0), x_dir=(1, 0, 0), z_dir=(0, 1, 0))) as fillet_8_piece_18_section:
        with BuildLine():
            CenterArc((FILLET_8_R, -FILLET_8_R), FILLET_8_R, 90, 90)
            Line((0, -FILLET_8_R), (0, 0))
            Line((0, 0), (FILLET_8_R, 0))
        make_face()
    fillet_8_piece_18 = extrude(amount=39, mode=Mode.PRIVATE)
    fillet_8_piece_18 = split(fillet_8_piece_18, bisect_by=Plane(origin=(-39.975991618, 31, 0.663250785), z_dir=(0, 1, 0)), keep=Keep.TOP, mode=Mode.PRIVATE)
    fillet_8_piece_18 = split(fillet_8_piece_18, bisect_by=Plane(origin=(-39.975991618, 35.5, 0.5), z_dir=(0, 0, 1)), keep=Keep.TOP, mode=Mode.PRIVATE)
    add(fillet_8_piece_18, mode=Mode.SUBTRACT)
    with BuildSketch(Plane(origin=(-46, 25.5, 0.5), x_dir=(1, 0, 0), z_dir=(0, 1, 0)), Plane(origin=(6, 25.5, 19.5), x_dir=(-1, 0, 0), z_dir=(0, 1, 0)), Plane(origin=(6, 33.5, 0.5), x_dir=(-1, 0, 0), z_dir=(0, -1, 0))) as fillet_8_piece_19:
        with BuildLine():
            CenterArc((FILLET_8_R, -FILLET_8_R), FILLET_8_R, 90, 90)
            Line((0, -FILLET_8_R), (0, 0))
            Line((0, 0), (FILLET_8_R, 0))
        make_face()
    extrude(amount=8, mode=Mode.SUBTRACT)
    with BuildSketch(Plane(origin=(-39.5, 39, 0), x_dir=(0, 0, 1), z_dir=(1, 0, 0))) as fillet_8_piece_20:
        with BuildLine():
            CenterArc((FILLET_8_R, FILLET_8_R), FILLET_8_R, 180, 90)
            Line((0, FILLET_8_R), (0, 0))
            Line((0, 0), (FILLET_8_R, 0))
        make_face()
    extrude(amount=39, mode=Mode.SUBTRACT)
    with BuildSketch(Plane(origin=(0, 39, 0.5), x_dir=(-1, 0, 0), z_dir=(0, 0, 1))) as fillet_8_piece_21:
        with BuildLine():
            CenterArc((FILLET_8_R, FILLET_8_R), FILLET_8_R, 180, 90)
            Line((0, FILLET_8_R), (0, 0))
            Line((0, 0), (FILLET_8_R, 0))
        make_face()
    extrude(amount=19, mode=Mode.SUBTRACT)
    with BuildSketch(Plane(origin=(0, 40, 20), x_dir=(0, 0, -1), z_dir=(0, -1, 0))) as fillet_8_piece_22_section:
        with BuildLine():
            CenterArc((FILLET_8_R, -FILLET_8_R), FILLET_8_R, 90, 90)
            Line((0, -FILLET_8_R), (0, 0))
            Line((0, 0), (FILLET_8_R, 0))
        make_face()
    fillet_8_piece_22 = extrude(amount=39, mode=Mode.PRIVATE)
    fillet_8_piece_22 = split(fillet_8_piece_22, bisect_by=Plane(origin=(-0.024008382, 35.5, 19.5), z_dir=(0, 0, -1)), keep=Keep.TOP, mode=Mode.PRIVATE)
    fillet_8_piece_22 = split(fillet_8_piece_22, bisect_by=Plane(origin=(-0.024008382, 31, 19.336749215), z_dir=(0, 1, 0)), keep=Keep.TOP, mode=Mode.PRIVATE)
    add(fillet_8_piece_22, mode=Mode.SUBTRACT)
    with BuildSketch(Plane(origin=(0, 40, 20), x_dir=(0, 0, -1), z_dir=(0, -1, 0))) as fillet_8_piece_23_section:
        with BuildLine():
            CenterArc((FILLET_8_R, -FILLET_8_R), FILLET_8_R, 90, 90)
            Line((0, -FILLET_8_R), (0, 0))
            Line((0, 0), (FILLET_8_R, 0))
        make_face()
    fillet_8_piece_23 = extrude(amount=39, mode=Mode.PRIVATE)
    fillet_8_piece_23 = split(fillet_8_piece_23, bisect_by=Plane(origin=(-0.25512006, 35.5, 19.5), z_dir=(0, 0, 1)), keep=Keep.TOP, mode=Mode.PRIVATE)
    fillet_8_piece_23 = split(fillet_8_piece_23, bisect_by=Plane(origin=(-0.25512006, 31, 19.835608236), z_dir=(0, 1, 0)), keep=Keep.TOP, mode=Mode.PRIVATE)
    add(fillet_8_piece_23, mode=Mode.SUBTRACT)
    with BuildSketch(Plane(origin=(0, 40, 20), x_dir=(0, 0, -1), z_dir=(0, -1, 0))) as fillet_8_piece_24_section:
        with BuildLine():
            CenterArc((FILLET_8_R, -FILLET_8_R), FILLET_8_R, 90, 90)
            Line((0, -FILLET_8_R), (0, 0))
            Line((0, 0), (FILLET_8_R, 0))
        make_face()
    fillet_8_piece_24 = extrude(amount=39, mode=Mode.PRIVATE)
    fillet_8_piece_24 = split(fillet_8_piece_24, bisect_by=Plane(origin=(-0.25512006, 29.5, 19.5), z_dir=(0, 0, 1)), keep=Keep.TOP, mode=Mode.PRIVATE)
    fillet_8_piece_24 = split(fillet_8_piece_24, bisect_by=Plane(origin=(-0.25512006, 28, 19.835608236), z_dir=(0, 1, 0)), keep=Keep.TOP, mode=Mode.PRIVATE)
    fillet_8_piece_24 = split(fillet_8_piece_24, bisect_by=Plane(origin=(-0.25512006, 31, 19.835608236), z_dir=(0, -1, 0)), keep=Keep.TOP, mode=Mode.PRIVATE)
    add(fillet_8_piece_24, mode=Mode.SUBTRACT)
    with BuildSketch(Plane(origin=(0, 40, 20), x_dir=(0, 0, -1), z_dir=(0, -1, 0))) as fillet_8_piece_25_section:
        with BuildLine():
            CenterArc((FILLET_8_R, -FILLET_8_R), FILLET_8_R, 90, 90)
            Line((0, -FILLET_8_R), (0, 0))
            Line((0, 0), (FILLET_8_R, 0))
        make_face()
    fillet_8_piece_25 = extrude(amount=39, mode=Mode.PRIVATE)
    fillet_8_piece_25 = split(fillet_8_piece_25, bisect_by=Plane(origin=(-0.024008382, 14.5, 19.5), z_dir=(0, 0, -1)), keep=Keep.TOP, mode=Mode.PRIVATE)
    fillet_8_piece_25 = split(fillet_8_piece_25, bisect_by=Plane(origin=(-0.024008382, 28, 19.336749215), z_dir=(0, -1, 0)), keep=Keep.TOP, mode=Mode.PRIVATE)
    add(fillet_8_piece_25, mode=Mode.SUBTRACT)
    with BuildSketch(Plane(origin=(0, 40, 20), x_dir=(0, 0, -1), z_dir=(0, -1, 0))) as fillet_8_piece_26_section:
        with BuildLine():
            CenterArc((FILLET_8_R, -FILLET_8_R), FILLET_8_R, 90, 90)
            Line((0, -FILLET_8_R), (0, 0))
            Line((0, 0), (FILLET_8_R, 0))
        make_face()
    fillet_8_piece_26 = extrude(amount=39, mode=Mode.PRIVATE)
    fillet_8_piece_26 = split(fillet_8_piece_26, bisect_by=Plane(origin=(-0.25512006, 14.5, 19.5), z_dir=(0, 0, 1)), keep=Keep.TOP, mode=Mode.PRIVATE)
    fillet_8_piece_26 = split(fillet_8_piece_26, bisect_by=Plane(origin=(-0.25512006, 28, 19.835608236), z_dir=(0, -1, 0)), keep=Keep.TOP, mode=Mode.PRIVATE)
    add(fillet_8_piece_26, mode=Mode.SUBTRACT)
    with BuildSketch(Plane(origin=(-40, 39, 0.5), x_dir=(1, 0, 0), z_dir=(0, 0, 1))) as fillet_8_piece_27:
        with BuildLine():
            CenterArc((FILLET_8_R, -FILLET_8_R), FILLET_8_R, 90, 90)
            Line((0, -FILLET_8_R), (0, 0))
            Line((0, 0), (FILLET_8_R, 0))
        make_face()
    extrude(amount=19, mode=Mode.SUBTRACT)
    with BuildSketch(Plane(origin=(-39.5, 39, 20), x_dir=(0, 0, -1), z_dir=(1, 0, 0))) as fillet_8_piece_28:
        with BuildLine():
            CenterArc((FILLET_8_R, -FILLET_8_R), FILLET_8_R, 90, 90)
            Line((0, -FILLET_8_R), (0, 0))
            Line((0, 0), (FILLET_8_R, 0))
        make_face()
    extrude(amount=39, mode=Mode.SUBTRACT)


solid = part.part
